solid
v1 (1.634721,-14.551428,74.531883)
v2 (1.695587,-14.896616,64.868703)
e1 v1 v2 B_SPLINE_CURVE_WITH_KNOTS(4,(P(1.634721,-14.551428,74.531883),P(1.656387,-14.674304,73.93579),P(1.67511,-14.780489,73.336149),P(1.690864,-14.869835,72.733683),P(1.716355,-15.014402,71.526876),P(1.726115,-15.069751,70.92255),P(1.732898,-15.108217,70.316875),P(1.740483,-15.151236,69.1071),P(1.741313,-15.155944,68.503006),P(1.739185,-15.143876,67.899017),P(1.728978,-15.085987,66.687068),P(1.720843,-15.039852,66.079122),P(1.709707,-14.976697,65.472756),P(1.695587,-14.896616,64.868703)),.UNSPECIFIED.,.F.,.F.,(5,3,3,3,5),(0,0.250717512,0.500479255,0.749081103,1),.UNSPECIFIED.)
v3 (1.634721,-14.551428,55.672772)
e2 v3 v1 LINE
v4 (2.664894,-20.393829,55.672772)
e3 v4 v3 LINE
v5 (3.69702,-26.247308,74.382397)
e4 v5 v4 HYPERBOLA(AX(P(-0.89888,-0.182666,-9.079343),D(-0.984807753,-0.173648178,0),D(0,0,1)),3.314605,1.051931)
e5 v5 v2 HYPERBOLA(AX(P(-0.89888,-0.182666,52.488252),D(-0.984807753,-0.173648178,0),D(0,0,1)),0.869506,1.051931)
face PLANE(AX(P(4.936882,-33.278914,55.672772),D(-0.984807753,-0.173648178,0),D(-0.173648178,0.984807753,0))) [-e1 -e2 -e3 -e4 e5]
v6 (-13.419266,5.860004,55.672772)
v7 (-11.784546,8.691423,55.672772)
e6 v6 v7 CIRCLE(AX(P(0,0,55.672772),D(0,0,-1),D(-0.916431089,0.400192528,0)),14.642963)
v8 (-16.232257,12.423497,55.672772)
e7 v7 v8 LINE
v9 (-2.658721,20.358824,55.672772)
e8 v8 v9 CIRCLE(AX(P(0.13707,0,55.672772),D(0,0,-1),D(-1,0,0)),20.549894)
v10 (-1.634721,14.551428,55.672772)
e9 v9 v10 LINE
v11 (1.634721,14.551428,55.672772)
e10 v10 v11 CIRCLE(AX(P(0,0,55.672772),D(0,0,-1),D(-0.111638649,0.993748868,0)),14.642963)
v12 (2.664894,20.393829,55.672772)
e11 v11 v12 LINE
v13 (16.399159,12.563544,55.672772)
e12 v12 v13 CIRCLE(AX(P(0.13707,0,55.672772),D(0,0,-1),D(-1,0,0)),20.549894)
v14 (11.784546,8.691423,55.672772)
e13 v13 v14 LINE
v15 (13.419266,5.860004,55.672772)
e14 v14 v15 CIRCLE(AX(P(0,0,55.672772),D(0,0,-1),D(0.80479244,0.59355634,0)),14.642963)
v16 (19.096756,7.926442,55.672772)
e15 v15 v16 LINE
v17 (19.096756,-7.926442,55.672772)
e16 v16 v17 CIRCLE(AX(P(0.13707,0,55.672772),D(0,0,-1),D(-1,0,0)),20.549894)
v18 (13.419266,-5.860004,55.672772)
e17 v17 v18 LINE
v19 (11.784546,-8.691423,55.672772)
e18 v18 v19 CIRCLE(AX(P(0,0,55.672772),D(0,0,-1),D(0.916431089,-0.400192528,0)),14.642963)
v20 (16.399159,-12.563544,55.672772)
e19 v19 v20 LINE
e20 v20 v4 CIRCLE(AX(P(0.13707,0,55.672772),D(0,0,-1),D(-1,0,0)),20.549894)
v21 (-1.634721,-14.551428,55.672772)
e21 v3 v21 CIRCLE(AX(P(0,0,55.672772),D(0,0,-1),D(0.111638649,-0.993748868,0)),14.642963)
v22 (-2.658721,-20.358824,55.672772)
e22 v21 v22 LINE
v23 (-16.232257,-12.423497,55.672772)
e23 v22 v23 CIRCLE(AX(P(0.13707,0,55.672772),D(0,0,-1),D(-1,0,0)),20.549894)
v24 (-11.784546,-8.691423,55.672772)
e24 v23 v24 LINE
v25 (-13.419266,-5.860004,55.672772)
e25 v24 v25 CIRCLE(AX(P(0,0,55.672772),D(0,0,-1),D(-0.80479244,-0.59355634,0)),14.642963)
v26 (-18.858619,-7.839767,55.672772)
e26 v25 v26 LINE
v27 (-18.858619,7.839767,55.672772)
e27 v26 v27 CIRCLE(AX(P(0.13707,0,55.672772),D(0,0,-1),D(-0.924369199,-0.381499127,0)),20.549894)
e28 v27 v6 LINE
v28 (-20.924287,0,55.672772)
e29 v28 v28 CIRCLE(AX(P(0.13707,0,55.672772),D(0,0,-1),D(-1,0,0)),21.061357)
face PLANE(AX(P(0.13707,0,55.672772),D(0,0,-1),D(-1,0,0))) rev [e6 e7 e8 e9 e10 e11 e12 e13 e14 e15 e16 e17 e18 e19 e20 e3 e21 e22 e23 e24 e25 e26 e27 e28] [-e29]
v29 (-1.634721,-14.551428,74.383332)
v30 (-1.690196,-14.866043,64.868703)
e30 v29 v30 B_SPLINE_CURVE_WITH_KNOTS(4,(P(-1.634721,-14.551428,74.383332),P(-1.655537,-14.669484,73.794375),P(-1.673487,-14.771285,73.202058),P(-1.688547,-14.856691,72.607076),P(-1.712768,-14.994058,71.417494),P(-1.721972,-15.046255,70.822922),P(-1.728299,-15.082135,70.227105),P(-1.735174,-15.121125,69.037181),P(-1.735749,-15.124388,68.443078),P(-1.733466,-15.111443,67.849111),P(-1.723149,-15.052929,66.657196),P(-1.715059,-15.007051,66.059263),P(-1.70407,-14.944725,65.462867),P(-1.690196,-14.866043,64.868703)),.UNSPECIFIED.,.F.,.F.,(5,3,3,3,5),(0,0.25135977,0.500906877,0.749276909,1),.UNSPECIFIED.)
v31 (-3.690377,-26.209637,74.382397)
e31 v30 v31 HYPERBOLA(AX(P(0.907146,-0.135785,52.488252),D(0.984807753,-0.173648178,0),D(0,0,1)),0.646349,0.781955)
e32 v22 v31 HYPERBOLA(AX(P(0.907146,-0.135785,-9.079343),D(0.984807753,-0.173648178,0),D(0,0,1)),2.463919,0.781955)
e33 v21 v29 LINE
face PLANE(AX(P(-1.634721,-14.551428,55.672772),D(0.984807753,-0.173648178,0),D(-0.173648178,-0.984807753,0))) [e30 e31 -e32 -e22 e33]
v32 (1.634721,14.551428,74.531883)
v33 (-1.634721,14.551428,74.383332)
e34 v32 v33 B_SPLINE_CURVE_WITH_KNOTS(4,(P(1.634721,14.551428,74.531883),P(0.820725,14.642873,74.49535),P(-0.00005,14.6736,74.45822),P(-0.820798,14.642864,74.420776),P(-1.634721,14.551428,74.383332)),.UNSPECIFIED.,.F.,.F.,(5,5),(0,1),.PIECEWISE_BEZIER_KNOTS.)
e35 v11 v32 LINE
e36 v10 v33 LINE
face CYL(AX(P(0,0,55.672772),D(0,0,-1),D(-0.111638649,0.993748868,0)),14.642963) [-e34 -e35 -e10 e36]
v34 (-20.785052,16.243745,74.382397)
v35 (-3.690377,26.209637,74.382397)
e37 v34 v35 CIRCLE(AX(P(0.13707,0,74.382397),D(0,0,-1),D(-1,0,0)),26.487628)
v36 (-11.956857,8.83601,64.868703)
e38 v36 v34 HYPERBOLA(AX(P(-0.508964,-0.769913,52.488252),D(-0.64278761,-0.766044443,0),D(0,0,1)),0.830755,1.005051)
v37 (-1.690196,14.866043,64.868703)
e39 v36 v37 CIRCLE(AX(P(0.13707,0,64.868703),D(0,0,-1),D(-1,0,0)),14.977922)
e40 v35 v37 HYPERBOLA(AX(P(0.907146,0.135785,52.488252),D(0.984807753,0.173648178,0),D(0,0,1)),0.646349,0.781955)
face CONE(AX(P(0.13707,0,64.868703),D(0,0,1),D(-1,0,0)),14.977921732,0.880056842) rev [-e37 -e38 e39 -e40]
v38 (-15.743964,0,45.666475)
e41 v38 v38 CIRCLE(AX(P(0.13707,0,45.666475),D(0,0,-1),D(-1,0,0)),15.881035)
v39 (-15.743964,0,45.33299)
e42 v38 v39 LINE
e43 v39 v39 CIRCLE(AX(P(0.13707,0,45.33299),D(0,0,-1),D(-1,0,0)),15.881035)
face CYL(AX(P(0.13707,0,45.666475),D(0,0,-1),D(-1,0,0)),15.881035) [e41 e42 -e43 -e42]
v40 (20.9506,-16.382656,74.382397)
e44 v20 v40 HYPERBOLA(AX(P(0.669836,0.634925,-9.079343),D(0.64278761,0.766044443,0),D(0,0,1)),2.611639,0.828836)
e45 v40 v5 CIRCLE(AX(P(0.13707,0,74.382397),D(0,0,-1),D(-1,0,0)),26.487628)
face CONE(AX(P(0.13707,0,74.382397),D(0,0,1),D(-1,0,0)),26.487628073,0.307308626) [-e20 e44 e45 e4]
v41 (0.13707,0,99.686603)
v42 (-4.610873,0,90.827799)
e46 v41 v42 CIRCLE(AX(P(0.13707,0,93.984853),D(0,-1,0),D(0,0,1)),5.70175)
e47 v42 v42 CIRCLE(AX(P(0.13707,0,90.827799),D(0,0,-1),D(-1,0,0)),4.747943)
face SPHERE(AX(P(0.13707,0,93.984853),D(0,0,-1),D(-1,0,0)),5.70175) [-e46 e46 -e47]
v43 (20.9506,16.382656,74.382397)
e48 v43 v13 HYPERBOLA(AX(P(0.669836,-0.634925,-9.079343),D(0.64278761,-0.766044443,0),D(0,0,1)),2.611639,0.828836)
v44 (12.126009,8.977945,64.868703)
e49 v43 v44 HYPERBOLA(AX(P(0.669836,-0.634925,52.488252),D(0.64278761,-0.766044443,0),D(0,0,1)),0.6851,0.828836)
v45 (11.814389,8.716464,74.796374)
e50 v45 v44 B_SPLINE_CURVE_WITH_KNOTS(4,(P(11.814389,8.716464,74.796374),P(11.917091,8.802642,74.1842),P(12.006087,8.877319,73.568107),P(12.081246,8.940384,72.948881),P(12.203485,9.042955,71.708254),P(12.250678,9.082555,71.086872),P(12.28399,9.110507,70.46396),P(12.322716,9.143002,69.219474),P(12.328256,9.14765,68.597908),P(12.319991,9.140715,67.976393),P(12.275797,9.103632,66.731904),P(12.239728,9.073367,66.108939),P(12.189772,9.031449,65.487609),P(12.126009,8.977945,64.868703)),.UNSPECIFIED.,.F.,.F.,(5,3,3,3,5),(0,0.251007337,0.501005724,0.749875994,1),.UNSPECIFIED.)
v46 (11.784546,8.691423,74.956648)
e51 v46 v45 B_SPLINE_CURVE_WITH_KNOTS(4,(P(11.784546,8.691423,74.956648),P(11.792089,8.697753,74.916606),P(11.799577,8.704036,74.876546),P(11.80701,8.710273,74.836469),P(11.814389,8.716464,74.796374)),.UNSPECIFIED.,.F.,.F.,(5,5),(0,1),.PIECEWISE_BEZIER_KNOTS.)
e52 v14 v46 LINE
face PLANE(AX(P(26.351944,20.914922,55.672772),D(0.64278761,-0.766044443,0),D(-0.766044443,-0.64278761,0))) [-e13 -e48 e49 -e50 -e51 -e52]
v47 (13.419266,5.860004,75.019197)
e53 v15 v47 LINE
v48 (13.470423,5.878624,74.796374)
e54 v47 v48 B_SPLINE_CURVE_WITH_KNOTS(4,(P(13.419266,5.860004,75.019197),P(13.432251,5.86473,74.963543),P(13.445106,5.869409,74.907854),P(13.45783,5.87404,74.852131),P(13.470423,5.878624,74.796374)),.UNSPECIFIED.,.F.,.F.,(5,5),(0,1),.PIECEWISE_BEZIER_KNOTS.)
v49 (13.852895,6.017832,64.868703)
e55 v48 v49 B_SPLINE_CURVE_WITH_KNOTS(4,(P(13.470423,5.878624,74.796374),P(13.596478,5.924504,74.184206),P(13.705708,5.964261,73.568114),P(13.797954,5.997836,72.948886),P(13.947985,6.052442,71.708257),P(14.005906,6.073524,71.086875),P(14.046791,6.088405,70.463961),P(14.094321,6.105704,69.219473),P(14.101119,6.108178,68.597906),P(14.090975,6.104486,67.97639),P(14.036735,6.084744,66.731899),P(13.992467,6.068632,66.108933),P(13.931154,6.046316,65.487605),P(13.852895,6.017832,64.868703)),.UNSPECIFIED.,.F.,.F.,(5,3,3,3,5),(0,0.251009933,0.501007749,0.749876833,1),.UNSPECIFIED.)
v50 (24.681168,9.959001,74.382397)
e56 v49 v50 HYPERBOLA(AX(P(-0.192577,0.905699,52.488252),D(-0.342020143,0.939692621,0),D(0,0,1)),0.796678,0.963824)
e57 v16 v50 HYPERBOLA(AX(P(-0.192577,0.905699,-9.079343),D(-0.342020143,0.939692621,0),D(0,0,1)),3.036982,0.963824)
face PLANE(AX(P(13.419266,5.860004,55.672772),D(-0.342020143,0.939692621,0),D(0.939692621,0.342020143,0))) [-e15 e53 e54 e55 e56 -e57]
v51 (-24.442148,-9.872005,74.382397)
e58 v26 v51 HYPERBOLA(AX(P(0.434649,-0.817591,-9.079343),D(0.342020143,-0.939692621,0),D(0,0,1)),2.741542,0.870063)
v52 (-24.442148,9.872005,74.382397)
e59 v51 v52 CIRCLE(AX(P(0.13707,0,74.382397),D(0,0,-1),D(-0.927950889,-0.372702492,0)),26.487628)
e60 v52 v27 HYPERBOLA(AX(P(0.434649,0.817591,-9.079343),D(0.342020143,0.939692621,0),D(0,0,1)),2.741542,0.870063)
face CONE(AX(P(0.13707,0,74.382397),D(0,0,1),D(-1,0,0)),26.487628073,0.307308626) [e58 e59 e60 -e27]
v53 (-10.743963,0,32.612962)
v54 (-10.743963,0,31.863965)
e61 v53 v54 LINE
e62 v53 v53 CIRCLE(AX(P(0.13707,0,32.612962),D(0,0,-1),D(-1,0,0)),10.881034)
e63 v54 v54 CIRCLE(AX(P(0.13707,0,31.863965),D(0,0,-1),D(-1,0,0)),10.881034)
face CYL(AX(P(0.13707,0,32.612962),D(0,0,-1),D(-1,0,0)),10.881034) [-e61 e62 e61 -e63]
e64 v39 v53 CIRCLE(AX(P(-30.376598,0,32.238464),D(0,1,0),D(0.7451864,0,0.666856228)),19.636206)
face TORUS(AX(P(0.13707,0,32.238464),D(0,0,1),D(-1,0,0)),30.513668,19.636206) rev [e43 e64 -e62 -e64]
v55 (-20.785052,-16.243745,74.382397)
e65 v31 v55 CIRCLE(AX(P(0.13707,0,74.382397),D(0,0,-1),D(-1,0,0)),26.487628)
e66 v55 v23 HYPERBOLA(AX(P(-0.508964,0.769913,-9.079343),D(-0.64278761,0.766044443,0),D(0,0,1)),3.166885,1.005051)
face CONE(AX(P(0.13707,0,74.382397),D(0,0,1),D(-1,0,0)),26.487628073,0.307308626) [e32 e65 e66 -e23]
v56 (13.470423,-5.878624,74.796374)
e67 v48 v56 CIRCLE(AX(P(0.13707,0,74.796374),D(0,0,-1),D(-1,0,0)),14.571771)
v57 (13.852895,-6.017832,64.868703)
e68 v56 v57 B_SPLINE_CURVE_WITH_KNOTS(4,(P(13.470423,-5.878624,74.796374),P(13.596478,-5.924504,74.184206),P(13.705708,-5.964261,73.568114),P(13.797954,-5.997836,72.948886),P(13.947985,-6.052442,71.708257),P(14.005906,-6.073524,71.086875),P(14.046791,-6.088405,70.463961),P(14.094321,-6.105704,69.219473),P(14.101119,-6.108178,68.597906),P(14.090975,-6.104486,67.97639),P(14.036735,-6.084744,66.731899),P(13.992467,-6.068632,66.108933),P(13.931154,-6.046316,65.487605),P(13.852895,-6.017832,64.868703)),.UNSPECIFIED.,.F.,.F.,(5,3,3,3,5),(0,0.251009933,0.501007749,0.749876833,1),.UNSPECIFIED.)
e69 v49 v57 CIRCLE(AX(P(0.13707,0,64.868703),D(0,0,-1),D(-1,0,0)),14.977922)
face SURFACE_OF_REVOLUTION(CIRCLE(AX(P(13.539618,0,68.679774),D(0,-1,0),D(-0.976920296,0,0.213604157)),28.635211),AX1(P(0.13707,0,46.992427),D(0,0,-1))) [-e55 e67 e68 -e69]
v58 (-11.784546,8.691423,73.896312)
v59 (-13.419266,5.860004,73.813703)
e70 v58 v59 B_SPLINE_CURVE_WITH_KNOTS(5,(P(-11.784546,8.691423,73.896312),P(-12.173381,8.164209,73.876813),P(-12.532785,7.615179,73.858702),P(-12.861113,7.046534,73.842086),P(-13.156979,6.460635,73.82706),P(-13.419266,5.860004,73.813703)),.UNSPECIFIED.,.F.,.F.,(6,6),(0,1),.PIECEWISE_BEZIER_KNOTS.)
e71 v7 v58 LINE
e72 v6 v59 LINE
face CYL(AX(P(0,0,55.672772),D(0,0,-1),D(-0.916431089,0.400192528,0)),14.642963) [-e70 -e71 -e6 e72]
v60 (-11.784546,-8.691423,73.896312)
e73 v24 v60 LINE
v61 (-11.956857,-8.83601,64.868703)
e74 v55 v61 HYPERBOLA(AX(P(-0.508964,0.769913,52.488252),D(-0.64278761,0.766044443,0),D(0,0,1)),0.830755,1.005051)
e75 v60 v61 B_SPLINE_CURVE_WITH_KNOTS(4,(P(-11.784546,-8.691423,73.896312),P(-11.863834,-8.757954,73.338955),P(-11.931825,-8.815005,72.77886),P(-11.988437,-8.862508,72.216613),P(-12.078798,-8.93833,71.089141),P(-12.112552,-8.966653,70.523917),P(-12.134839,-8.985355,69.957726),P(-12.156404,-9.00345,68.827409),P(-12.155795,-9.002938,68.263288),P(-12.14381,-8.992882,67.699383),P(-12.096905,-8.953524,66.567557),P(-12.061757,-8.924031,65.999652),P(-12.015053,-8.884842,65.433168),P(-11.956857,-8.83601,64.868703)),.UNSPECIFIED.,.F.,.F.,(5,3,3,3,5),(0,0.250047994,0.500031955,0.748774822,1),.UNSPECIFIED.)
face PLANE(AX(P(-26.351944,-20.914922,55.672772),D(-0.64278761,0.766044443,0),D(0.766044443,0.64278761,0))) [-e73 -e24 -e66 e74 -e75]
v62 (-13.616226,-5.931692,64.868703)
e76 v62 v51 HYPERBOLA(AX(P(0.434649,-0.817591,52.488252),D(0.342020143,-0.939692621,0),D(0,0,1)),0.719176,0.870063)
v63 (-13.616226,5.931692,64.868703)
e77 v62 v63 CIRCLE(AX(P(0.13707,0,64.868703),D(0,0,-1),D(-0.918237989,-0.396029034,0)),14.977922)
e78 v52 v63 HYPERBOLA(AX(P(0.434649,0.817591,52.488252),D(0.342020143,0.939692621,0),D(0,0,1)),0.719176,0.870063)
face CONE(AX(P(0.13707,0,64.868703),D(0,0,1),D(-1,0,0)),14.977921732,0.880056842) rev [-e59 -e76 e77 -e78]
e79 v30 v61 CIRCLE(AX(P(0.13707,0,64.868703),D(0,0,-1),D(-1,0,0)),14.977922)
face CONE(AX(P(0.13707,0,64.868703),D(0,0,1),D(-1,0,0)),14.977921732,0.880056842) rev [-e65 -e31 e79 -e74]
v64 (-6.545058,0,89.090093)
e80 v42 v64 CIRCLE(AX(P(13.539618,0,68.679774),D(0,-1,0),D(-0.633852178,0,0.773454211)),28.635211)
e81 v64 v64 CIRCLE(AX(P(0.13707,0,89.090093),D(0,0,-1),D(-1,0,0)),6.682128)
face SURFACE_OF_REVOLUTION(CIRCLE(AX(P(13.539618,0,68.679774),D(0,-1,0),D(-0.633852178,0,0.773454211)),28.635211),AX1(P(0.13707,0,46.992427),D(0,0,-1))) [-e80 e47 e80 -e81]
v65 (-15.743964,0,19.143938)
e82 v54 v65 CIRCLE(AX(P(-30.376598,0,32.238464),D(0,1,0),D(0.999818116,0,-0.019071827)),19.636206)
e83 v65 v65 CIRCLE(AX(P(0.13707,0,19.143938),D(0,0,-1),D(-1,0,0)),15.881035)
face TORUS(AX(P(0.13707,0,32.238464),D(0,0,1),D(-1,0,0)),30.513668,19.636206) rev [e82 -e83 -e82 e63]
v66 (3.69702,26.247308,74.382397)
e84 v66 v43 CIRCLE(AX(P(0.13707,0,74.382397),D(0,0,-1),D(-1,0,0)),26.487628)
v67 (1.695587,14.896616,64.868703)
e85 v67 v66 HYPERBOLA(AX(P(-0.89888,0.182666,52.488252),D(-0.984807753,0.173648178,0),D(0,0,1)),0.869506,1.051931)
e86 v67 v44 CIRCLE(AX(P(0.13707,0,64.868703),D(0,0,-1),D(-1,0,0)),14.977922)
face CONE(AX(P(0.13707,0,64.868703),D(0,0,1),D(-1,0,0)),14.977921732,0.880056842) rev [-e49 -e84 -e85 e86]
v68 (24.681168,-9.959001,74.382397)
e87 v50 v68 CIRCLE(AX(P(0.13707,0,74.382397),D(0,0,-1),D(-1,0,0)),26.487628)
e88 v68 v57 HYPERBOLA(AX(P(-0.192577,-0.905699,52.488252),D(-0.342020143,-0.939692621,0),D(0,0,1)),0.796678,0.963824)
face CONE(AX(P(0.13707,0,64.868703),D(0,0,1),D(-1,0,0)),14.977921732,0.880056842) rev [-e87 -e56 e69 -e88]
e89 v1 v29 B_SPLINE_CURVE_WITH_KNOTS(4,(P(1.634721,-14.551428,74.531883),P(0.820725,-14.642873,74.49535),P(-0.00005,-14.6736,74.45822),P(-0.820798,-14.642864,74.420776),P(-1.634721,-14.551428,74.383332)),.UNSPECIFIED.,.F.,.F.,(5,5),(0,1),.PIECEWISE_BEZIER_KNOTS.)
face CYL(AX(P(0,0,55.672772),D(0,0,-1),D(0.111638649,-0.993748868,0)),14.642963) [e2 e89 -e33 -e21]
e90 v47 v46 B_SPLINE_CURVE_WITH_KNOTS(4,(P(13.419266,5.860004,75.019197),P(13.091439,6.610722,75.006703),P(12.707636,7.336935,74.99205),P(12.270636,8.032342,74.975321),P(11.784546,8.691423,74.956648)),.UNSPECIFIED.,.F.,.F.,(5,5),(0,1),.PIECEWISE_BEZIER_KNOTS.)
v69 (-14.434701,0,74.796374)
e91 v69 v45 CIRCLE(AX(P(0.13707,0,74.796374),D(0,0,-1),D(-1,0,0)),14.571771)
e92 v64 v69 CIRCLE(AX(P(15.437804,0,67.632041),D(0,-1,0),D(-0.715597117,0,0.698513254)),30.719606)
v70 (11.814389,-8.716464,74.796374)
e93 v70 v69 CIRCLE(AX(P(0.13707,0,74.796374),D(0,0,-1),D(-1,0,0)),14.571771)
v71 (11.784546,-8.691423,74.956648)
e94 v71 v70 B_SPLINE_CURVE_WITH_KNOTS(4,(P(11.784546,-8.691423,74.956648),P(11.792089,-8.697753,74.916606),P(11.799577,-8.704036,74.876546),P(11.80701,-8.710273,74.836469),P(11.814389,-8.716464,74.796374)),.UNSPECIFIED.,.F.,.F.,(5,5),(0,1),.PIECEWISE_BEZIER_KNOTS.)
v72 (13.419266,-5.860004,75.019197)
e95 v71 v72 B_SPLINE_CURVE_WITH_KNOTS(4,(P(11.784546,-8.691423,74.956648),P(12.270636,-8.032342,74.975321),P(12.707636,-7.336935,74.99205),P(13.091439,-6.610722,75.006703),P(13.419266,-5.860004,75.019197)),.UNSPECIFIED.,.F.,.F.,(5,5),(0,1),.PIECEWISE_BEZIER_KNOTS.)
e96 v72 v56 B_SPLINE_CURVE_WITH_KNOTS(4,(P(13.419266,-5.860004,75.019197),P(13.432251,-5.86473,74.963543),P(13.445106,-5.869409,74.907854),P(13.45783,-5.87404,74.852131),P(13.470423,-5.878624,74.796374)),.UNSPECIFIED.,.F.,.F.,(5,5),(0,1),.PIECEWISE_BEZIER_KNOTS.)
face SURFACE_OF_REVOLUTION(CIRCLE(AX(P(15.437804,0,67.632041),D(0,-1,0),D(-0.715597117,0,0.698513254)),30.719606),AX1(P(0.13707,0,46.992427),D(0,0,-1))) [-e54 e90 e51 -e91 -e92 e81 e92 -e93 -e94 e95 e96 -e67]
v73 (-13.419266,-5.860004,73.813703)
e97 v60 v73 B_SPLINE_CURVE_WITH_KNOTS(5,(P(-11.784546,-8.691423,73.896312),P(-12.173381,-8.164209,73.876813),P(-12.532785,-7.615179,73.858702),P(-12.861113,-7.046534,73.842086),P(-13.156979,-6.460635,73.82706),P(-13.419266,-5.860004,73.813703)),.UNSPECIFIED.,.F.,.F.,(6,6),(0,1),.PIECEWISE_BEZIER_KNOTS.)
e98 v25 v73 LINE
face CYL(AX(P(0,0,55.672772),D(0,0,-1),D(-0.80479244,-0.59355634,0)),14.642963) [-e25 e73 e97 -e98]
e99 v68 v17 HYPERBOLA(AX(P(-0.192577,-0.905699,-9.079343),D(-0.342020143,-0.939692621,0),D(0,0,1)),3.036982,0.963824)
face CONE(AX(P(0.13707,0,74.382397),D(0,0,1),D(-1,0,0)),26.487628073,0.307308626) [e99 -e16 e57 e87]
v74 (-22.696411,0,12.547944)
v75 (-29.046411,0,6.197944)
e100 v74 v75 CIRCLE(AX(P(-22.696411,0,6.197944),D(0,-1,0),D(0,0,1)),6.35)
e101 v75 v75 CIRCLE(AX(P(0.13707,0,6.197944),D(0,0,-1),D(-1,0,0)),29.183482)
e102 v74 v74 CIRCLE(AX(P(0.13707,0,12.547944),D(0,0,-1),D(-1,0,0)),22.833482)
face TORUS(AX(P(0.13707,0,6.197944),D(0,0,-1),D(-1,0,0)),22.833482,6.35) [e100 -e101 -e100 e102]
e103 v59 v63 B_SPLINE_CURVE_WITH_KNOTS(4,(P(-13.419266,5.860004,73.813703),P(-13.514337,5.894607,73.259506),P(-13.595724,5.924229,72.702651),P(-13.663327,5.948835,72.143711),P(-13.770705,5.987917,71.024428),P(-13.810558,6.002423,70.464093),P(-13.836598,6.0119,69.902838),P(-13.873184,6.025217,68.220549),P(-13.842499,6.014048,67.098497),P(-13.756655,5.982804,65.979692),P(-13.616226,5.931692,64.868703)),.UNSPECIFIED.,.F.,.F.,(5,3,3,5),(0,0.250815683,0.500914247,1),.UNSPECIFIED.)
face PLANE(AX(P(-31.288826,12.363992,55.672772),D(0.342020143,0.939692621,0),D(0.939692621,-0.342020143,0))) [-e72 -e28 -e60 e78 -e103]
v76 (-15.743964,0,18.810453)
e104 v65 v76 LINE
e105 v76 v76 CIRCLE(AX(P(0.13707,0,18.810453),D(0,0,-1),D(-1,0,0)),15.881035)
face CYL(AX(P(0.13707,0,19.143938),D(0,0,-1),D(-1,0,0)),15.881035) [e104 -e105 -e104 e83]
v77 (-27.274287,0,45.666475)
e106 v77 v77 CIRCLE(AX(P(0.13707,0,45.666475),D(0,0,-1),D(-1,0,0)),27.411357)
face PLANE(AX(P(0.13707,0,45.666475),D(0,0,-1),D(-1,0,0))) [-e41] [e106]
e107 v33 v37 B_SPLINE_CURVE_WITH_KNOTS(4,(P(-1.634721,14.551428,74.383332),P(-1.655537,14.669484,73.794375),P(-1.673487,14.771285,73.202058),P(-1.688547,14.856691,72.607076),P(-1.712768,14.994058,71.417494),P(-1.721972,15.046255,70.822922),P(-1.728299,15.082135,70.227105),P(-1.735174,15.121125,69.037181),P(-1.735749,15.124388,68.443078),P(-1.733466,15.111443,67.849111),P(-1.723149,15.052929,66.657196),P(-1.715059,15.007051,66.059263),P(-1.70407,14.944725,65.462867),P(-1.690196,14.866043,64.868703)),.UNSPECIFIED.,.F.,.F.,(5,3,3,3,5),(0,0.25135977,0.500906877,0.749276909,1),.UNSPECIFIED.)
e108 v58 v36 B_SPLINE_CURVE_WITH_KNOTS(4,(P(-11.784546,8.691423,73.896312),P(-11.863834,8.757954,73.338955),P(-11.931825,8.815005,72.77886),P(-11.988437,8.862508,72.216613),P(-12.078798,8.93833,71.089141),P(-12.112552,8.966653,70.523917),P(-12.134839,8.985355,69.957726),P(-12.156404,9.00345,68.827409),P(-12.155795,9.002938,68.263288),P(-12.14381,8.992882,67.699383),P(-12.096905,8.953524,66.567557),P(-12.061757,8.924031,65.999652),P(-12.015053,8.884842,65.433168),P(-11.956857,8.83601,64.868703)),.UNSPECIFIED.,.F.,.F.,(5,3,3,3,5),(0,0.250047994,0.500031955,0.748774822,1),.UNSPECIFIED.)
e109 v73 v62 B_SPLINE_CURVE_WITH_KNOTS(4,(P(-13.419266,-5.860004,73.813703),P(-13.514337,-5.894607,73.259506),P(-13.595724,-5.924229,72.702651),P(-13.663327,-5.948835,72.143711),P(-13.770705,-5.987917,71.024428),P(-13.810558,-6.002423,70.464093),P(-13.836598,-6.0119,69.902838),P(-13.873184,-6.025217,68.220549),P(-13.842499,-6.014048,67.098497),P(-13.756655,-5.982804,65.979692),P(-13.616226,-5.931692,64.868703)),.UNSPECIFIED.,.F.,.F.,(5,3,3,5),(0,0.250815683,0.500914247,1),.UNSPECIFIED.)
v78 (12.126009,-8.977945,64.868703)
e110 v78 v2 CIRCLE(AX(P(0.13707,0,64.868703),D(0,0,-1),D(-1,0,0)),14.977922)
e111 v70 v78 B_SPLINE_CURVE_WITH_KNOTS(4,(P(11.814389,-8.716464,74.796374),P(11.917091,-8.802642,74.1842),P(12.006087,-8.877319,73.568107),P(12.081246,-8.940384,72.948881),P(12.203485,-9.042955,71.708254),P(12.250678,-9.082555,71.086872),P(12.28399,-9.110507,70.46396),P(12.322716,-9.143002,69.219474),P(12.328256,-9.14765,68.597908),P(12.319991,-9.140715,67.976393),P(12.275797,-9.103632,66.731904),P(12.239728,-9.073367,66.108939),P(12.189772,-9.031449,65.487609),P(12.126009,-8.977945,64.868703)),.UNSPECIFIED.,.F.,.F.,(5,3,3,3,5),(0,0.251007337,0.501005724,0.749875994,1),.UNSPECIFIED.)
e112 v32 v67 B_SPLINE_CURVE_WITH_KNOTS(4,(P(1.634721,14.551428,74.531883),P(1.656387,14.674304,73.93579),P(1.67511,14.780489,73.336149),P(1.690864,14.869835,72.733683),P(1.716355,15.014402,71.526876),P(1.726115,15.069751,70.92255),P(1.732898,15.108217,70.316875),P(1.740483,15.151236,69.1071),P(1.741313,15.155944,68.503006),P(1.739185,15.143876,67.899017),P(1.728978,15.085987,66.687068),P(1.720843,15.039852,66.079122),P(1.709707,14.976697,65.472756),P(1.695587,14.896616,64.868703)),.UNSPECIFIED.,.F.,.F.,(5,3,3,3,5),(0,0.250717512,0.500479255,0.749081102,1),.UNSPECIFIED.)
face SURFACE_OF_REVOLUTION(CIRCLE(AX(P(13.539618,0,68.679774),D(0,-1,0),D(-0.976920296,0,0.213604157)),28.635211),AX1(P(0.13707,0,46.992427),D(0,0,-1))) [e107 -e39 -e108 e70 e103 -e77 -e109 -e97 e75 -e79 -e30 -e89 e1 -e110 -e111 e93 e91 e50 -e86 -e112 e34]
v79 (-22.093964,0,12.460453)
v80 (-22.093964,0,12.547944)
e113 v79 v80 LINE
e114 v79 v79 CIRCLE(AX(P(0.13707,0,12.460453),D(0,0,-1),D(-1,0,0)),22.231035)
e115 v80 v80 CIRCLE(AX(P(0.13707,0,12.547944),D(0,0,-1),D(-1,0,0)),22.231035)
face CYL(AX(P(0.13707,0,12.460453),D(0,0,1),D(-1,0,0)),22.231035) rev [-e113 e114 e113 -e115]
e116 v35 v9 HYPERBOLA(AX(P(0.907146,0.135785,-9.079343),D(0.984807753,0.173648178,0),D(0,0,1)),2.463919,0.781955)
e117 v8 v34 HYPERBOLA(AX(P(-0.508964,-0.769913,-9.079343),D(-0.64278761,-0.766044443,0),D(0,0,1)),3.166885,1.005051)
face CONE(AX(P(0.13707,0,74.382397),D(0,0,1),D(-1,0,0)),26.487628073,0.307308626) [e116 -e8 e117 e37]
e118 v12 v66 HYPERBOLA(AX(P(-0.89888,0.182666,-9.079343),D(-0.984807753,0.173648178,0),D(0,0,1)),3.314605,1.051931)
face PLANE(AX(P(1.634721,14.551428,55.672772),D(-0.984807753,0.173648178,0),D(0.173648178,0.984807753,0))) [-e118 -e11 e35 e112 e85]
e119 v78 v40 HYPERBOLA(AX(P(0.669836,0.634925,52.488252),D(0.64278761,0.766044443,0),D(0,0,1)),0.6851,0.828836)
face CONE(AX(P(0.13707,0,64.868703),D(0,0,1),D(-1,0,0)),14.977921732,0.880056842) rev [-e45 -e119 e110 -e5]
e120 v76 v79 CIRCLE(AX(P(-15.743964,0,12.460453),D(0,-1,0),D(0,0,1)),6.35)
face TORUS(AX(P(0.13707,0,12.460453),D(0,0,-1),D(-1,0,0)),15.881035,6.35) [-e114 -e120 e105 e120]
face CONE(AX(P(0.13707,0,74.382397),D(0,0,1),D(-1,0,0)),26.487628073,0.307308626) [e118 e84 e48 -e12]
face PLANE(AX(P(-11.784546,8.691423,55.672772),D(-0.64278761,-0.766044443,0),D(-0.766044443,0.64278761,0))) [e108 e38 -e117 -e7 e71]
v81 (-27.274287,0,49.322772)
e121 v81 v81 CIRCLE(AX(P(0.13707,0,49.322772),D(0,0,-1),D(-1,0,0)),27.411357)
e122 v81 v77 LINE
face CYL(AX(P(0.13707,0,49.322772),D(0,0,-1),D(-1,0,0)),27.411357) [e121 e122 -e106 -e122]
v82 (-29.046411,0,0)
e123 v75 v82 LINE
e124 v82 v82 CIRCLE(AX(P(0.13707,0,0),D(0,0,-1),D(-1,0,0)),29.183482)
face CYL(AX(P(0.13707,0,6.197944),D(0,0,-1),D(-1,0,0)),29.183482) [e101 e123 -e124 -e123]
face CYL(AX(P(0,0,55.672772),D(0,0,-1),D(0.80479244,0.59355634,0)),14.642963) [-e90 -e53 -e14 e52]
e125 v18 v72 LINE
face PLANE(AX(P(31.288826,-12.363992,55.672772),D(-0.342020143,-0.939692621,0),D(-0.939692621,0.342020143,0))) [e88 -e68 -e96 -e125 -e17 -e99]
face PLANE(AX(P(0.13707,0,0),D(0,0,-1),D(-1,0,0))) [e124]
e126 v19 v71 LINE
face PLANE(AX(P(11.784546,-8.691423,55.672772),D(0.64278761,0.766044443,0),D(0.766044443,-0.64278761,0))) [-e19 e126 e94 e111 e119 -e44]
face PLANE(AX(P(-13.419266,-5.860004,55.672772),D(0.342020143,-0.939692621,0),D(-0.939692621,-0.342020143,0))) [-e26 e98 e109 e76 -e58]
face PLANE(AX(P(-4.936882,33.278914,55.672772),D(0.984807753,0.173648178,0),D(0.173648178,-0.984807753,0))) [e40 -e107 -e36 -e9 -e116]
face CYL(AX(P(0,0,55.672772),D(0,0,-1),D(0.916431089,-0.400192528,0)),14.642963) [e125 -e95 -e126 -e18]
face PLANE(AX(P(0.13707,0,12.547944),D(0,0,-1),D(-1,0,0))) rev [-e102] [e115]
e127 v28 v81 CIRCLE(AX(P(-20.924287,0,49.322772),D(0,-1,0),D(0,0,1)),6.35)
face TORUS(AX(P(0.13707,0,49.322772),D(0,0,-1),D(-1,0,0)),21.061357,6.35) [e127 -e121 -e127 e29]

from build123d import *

# Parameters (mm, degrees)
F4_DEPTH = 25


# Not quite as in the source:
# - a feature names something its author has since deleted; it is built from what else it names


with BuildPart() as f1:
    # F0 (on Front) → F1 (revolve)
    with BuildSketch(Plane.XZ):
        with BuildLine():
            Line((-29.0464114308, 0), (0.1370703891, 0))
            Line((0.1370703891, 0), (0.1370703891, 88.2831028199))
            ThreePointArc((0.1370703891, 88.2831028199), (-2.5563679659, 88.9593833587), (-4.6108727149, 90.82779867))
            ThreePointArc((-4.6108727149, 90.82779867), (-5.5976988093, 89.9809104676), (-6.5450577748, 89.0900926644))
            ThreePointArc((-6.5450577748, 89.0900926644), (-11.4568488827, 82.476967596), (-14.4347006416, 74.7963742622))
            ThreePointArc((-14.4347006416, 74.7963742622), (-15.0716593897, 69.8502894666), (-14.8408513427, 64.8687034845))
            Line((-14.8408513427, 64.8687034845), (-26.3505576842, 74.3823973839))
            Line((-26.3505576842, 74.3823973839), (-20.4128239214, 55.6727722287))
            Line((-20.4128239214, 55.6727722287), (-20.9242871106, 55.6727722287))
            ThreePointArc((-20.9242871106, 55.6727722287), (-25.4144151711, 53.8129002893), (-27.2742871106, 49.3227722287))
            Line((-27.2742871106, 49.3227722287), (-27.2742871106, 45.666474849))
            Line((-27.2742871106, 45.666474849), (-15.7439641526, 45.666474849))
            Line((-15.7439641526, 45.666474849), (-15.7439641526, 45.3329899947))
            ThreePointArc((-15.7439641526, 45.3329899947), (-12.1015621728, 39.422032357), (-10.7439633369, 32.612962099))
            ThreePointArc((-10.7439633369, 32.612962099), (-10.7403918284, 32.2384637675), (-10.7439633369, 31.863965436))
            ThreePointArc((-10.7439633369, 31.863965436), (-12.1015621728, 25.054895178), (-15.7439641526, 19.1439375403))
            Line((-15.7439641526, 19.1439375403), (-15.7439641526, 18.810452686))
            ThreePointArc((-15.7439641526, 18.810452686), (-20.2340922131, 16.9505807466), (-22.0939641526, 12.460452686))
            Line((-22.0939641526, 12.460452686), (-22.0939641526, 12.5479437411))
            Line((-22.0939641526, 12.5479437411), (-22.6964114308, 12.5479437411))
            ThreePointArc((-22.6964114308, 12.5479437411), (-27.1865394914, 10.6880718016), (-29.0464114308, 6.1979437411))
            Line((-29.0464114308, 6.1979437411), (-29.0464114308, 0))
        make_face()
        with BuildLine():
            ThreePointArc((-4.6108727149, 90.82779867), (-2.5563679659, 88.9593833587), (0.1370703891, 88.2831028199))
            Line((0.1370703891, 88.2831028199), (0.1370703891, 93.9848531267))
            Line((0.1370703891, 93.9848531267), (0.1370703891, 99.6866034335))
            ThreePointArc((0.1370703891, 99.6866034335), (-4.8883993789, 96.6782914817), (-4.6108727149, 90.82779867))
        make_face()
        with BuildLine():
            Line((-10.7439633369, 32.612962099), (-10.7439633369, 31.863965436))
            ThreePointArc((-10.7439633369, 31.863965436), (-10.7403918284, 32.2384637675), (-10.7439633369, 32.612962099))
        make_face()
    revolve(axis=Axis((0.1370703891, 0, 46.9924265633), (0, 0, -1)))

    # F3 (on face) → F4 (cut)
    with BuildSketch(Plane.XY.offset(55.6727722287)):
        with BuildLine():
            ThreePointArc((-1.6347205774, 14.5514276956), (0, 14.6429627926), (1.6347205774, 14.5514276956))
            Line((1.6347205774, 14.5514276956), (4.9368817802, 33.2789144903))
            ThreePointArc((4.9368817802, 33.2789144903), (0, 33.6431114995), (-4.9368817802, 33.2789144903))
            Line((-4.9368817802, 33.2789144903), (-1.6347205774, 14.5514276956))
        make_face()
        with BuildLine():
            ThreePointArc((-13.4192663344, 5.8600042997), (-12.681177765, 7.3214813963), (-11.784545757, 8.6914233959))
            Line((-11.784545757, 8.6914233959), (-26.3519444689, 20.9149222823))
            ThreePointArc((-26.3519444689, 20.9149222823), (-29.1357892209, 16.8215557497), (-31.2888262491, 12.3639922081))
            Line((-31.2888262491, 12.3639922081), (-13.4192663344, 5.8600042997))
        make_face()
        with BuildLine():
            ThreePointArc((-11.784545757, -8.6914233959), (-12.681177765, -7.3214813963), (-13.4192663344, -5.8600042997))
            Line((-13.4192663344, -5.8600042997), (-31.2888262491, -12.3639922081))
            ThreePointArc((-31.2888262491, -12.3639922081), (-29.1357892209, -16.8215557497), (-26.3519444689, -20.9149222823))
            Line((-26.3519444689, -20.9149222823), (-11.784545757, -8.6914233959))
        make_face()
        with BuildLine():
            ThreePointArc((1.6347205774, -14.5514276956), (0, -14.6429627926), (-1.6347205774, -14.5514276956))
            Line((-1.6347205774, -14.5514276956), (-4.9368817802, -33.2789144903))
            ThreePointArc((-4.9368817802, -33.2789144903), (0, -33.6431114995), (4.9368817802, -33.2789144903))
            Line((4.9368817802, -33.2789144903), (1.6347205774, -14.5514276956))
        make_face()
        with BuildLine():
            ThreePointArc((13.4192663344, -5.8600042997), (12.681177765, -7.3214813963), (11.784545757, -8.6914233959))
            Line((11.784545757, -8.6914233959), (26.3519444689, -20.9149222823))
            ThreePointArc((26.3519444689, -20.9149222823), (29.1357892209, -16.8215557497), (31.2888262491, -12.3639922081))
            Line((31.2888262491, -12.3639922081), (13.4192663344, -5.8600042997))
        make_face()
        with BuildLine():
            ThreePointArc((11.784545757, 8.6914233959), (12.681177765, 7.3214813963), (13.4192663344, 5.8600042997))
            Line((13.4192663344, 5.8600042997), (31.2888262491, 12.3639922081))
            ThreePointArc((31.2888262491, 12.3639922081), (29.1357892209, 16.8215557497), (26.3519444689, 20.9149222823))
            Line((26.3519444689, 20.9149222823), (11.784545757, 8.6914233959))
        make_face()
    extrude(amount=F4_DEPTH, mode=Mode.SUBTRACT)


solid = f1.part
